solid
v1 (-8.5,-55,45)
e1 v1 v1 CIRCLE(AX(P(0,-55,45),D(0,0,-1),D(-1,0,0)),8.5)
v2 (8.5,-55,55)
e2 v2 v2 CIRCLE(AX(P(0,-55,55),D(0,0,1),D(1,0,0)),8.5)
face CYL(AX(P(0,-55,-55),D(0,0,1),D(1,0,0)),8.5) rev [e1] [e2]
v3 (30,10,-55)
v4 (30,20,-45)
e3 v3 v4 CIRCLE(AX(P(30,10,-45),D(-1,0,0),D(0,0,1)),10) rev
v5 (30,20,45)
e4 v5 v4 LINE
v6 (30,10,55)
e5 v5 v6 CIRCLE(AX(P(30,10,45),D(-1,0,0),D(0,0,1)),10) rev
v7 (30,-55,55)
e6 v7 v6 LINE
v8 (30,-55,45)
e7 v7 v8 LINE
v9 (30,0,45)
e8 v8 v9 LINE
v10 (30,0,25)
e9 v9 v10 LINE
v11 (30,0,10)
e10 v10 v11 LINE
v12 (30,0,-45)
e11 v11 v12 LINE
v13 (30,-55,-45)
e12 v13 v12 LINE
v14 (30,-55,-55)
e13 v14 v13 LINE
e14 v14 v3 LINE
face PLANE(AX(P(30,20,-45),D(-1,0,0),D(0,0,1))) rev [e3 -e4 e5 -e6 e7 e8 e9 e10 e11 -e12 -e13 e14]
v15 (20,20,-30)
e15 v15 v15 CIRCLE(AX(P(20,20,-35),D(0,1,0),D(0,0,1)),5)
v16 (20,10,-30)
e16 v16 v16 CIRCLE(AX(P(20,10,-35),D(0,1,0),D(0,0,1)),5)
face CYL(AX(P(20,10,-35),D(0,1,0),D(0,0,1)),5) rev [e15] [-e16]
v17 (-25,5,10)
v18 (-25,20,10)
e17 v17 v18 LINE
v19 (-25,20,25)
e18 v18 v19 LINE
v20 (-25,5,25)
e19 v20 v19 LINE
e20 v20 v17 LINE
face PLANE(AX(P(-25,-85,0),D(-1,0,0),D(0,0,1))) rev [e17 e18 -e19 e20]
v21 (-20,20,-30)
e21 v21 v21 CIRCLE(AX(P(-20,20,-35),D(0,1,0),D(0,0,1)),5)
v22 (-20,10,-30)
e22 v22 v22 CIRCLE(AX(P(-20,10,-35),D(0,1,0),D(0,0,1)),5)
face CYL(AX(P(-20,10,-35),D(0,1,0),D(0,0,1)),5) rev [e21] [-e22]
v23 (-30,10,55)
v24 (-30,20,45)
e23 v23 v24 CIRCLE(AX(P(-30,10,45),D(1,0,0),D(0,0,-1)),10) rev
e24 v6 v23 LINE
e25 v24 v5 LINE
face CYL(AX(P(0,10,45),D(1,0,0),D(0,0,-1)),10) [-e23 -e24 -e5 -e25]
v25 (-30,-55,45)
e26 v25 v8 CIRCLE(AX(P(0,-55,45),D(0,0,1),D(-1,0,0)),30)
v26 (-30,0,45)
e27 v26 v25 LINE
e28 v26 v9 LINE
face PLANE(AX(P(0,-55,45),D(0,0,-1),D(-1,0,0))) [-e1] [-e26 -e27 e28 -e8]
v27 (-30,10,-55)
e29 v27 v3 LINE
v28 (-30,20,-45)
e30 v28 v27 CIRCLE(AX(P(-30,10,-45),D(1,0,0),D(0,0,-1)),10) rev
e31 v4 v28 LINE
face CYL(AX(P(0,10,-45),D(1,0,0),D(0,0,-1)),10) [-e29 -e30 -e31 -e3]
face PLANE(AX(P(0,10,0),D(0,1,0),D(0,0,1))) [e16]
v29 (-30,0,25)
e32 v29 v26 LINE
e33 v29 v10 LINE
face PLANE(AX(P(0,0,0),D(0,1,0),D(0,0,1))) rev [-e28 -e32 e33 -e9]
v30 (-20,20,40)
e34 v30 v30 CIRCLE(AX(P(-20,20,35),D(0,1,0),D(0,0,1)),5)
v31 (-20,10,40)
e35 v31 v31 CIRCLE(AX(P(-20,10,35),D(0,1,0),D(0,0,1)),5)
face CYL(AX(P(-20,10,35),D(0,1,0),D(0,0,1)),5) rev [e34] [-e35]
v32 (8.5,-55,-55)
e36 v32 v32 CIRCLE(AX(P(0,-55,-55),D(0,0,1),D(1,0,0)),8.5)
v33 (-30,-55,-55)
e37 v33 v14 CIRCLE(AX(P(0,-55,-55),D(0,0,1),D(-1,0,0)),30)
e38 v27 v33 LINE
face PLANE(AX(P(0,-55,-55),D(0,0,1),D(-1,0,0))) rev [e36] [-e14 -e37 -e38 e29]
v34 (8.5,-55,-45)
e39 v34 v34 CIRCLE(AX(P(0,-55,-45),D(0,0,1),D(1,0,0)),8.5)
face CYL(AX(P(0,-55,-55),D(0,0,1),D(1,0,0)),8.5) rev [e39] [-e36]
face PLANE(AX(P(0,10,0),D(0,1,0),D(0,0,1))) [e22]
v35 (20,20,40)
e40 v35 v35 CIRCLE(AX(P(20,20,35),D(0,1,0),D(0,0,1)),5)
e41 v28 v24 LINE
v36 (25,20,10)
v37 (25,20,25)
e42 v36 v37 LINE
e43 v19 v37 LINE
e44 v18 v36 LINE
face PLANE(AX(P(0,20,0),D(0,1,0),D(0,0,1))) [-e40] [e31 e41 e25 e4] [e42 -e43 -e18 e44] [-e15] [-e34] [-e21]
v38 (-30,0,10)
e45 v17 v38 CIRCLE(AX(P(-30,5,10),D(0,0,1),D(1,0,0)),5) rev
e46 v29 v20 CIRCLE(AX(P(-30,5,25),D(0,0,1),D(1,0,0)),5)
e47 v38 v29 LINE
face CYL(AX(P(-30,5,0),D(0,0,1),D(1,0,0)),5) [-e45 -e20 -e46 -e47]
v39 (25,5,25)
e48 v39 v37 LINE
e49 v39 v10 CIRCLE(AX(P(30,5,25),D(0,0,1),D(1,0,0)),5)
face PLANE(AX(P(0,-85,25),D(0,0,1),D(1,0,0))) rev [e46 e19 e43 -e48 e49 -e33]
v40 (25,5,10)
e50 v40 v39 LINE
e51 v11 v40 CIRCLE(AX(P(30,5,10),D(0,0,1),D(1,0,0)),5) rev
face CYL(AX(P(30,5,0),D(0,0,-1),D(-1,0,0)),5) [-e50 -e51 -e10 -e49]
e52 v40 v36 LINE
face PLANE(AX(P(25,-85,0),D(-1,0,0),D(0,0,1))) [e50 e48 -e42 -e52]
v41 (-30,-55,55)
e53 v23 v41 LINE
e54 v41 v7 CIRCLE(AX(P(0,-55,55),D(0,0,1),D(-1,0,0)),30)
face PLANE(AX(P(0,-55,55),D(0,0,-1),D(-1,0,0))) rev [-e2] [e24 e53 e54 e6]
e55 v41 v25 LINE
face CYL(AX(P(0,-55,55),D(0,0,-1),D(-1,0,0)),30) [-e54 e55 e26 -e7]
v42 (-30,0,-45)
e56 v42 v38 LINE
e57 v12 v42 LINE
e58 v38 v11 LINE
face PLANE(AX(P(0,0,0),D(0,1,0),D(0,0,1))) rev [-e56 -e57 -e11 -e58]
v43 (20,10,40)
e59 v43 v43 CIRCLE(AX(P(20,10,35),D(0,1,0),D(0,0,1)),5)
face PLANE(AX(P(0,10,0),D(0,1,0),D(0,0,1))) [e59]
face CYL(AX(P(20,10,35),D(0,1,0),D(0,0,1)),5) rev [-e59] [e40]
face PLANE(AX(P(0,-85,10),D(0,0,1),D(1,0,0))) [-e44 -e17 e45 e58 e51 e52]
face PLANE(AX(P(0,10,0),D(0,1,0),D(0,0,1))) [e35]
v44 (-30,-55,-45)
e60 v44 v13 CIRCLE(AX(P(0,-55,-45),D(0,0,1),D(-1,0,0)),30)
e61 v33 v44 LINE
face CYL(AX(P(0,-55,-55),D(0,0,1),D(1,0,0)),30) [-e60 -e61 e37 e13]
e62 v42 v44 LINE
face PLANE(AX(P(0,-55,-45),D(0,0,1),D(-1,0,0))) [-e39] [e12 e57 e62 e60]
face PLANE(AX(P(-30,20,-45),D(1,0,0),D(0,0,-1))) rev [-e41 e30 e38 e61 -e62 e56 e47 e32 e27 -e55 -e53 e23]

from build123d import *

# Parameters (mm, degrees)
SKETCH1_W           = 60
SKETCH1_H           = 90
BOSS_EXTRUDE1_DEPTH = 20
CUT_EXTRUDE1_DEPTH  = 10
BOSS_EXTRUDE2_DEPTH = 10
SKETCH5_R           = 8.5
CUT_EXTRUDE2_DEPTH  = 143.214626533
FILLET1_R           = 10
SKETCH6_W           = 50
SKETCH6_H           = 15
CUT_EXTRUDE3_DEPTH  = 123.270192606
FILLET2_R           = 5


with BuildPart() as part:
    # Sketch1 → Boss-Extrude1 (new body)
    with BuildSketch(Plane(origin=(0, 0, 0), x_dir=(1, 0, 0), z_dir=(0, 1, 0))):
        Rectangle(SKETCH1_W, SKETCH1_H)
    extrude(amount=BOSS_EXTRUDE1_DEPTH)

    # Sketch3 → Cut-Extrude1 (cut)
    with BuildSketch(Plane(origin=(0, 20, 0), x_dir=(1, 0, 0), z_dir=(0, 1, 0))):
        with BuildLine():
            ThreePointArc((-20, 30), (-16.464466094, 31.464466094), (-15, 35))
            Line((-15, 35), (-20, 35))
            Line((-20, 35), (-20, 30))
        make_face()
        with BuildLine():
            Line((-20, 35), (-15, 35))
            ThreePointArc((-15, 35), (-23.535533906, 38.535533906), (-20, 30))
            Line((-20, 30), (-20, 35))
        make_face()
        with BuildLine():
            ThreePointArc((-20, 30), (-16.464466094, 31.464466094), (-15, 35))
            Line((-15, 35), (-20, 35))
            Line((-20, 35), (-20, 30))
        make_face()
        with BuildLine():
            Line((-20, 35), (-15, 35))
            ThreePointArc((-15, 35), (-23.535533906, 38.535533906), (-20, 30))
            Line((-20, 30), (-20, 35))
        make_face()
        with BuildLine():
            ThreePointArc((-20, -30), (-23.535533906, -38.535533906), (-15, -35))
            Line((-15, -35), (-20, -35))
            Line((-20, -35), (-20, -30))
        make_face()
        with BuildLine():
            Line((-20, -35), (-15, -35))
            ThreePointArc((-15, -35), (-16.464466094, -31.464466094), (-20, -30))
            Line((-20, -30), (-20, -35))
        make_face()
        with BuildLine():
            ThreePointArc((-20, -30), (-23.535533906, -38.535533906), (-15, -35))
            Line((-15, -35), (-20, -35))
            Line((-20, -35), (-20, -30))
        make_face()
        with BuildLine():
            Line((-20, -35), (-15, -35))
            ThreePointArc((-15, -35), (-16.464466094, -31.464466094), (-20, -30))
            Line((-20, -30), (-20, -35))
        make_face()
        with BuildLine():
            Line((15, -35), (20, -35))
            Line((20, -35), (20, -30))
            ThreePointArc((20, -30), (16.464466094, -31.464466094), (15, -35))
        make_face()
        with BuildLine():
            Line((20, -30), (20, -35))
            Line((20, -35), (15, -35))
            ThreePointArc((15, -35), (20, -40), (25, -35))
            ThreePointArc((25, -35), (23.535533906, -31.464466094), (20, -30))
        make_face()
        with BuildLine():
            Line((15, -35), (20, -35))
            Line((20, -35), (20, -30))
            ThreePointArc((20, -30), (16.464466094, -31.464466094), (15, -35))
        make_face()
        with BuildLine():
            Line((20, -30), (20, -35))
            Line((20, -35), (15, -35))
            ThreePointArc((15, -35), (20, -40), (25, -35))
            ThreePointArc((25, -35), (23.535533906, -31.464466094), (20, -30))
        make_face()
        with BuildLine():
            ThreePointArc((15, 35), (16.464466094, 31.464466094), (20, 30))
            Line((20, 30), (20, 35))
            Line((20, 35), (15, 35))
        make_face()
        with BuildLine():
            Line((20, 35), (20, 30))
            ThreePointArc((20, 30), (23.535533906, 31.464466094), (25, 35))
            ThreePointArc((25, 35), (20, 40), (15, 35))
            Line((15, 35), (20, 35))
        make_face()
        with BuildLine():
            ThreePointArc((15, 35), (16.464466094, 31.464466094), (20, 30))
            Line((20, 30), (20, 35))
            Line((20, 35), (15, 35))
        make_face()
        with BuildLine():
            Line((20, 35), (20, 30))
            ThreePointArc((20, 30), (23.535533906, 31.464466094), (25, 35))
            ThreePointArc((25, 35), (20, 40), (15, 35))
            Line((15, 35), (20, 35))
        make_face()
    extrude(amount=-CUT_EXTRUDE1_DEPTH, mode=Mode.SUBTRACT)

    # Sketch4 → Boss-Extrude2 (add)
    with BuildSketch(Plane.XY.offset(45)):
        with BuildLine():
            Line((-30, 0), (-30, -55))
            ThreePointArc((-30, -55), (0, -85), (30, -55))
            Line((30, -55), (30, 0))
            Line((30, 0), (30, 20))
            Line((30, 20), (-30, 20))
            Line((-30, 20), (-30, 0))
        make_face()
    boss_extrude2 = extrude(amount=BOSS_EXTRUDE2_DEPTH)

    # Mirror1: Boss-Extrude2 across plane
    add(boss_extrude2.mirror(Plane.XY))

    # Sketch5 → Cut-Extrude2 (cut, through all)
    with BuildSketch(Plane.XY.offset(55)):
        with Locations((0, -55)):
            Circle(SKETCH5_R)
    extrude(amount=-CUT_EXTRUDE2_DEPTH, mode=Mode.SUBTRACT)

    # Fillet1
    fillet1_edges = [part.edges().sort_by_distance(p)[0] for p in [
        (0, 20, 55),
        (0, 20, -55),
    ]]
    fillet(fillet1_edges, radius=FILLET1_R)

    # Sketch6 → Cut-Extrude3 (cut, through all)
    with BuildSketch(Plane(origin=(0, 20, 0), x_dir=(1, 0, 0), z_dir=(0, 1, 0))):
        with Locations((0, -17.5)):
            Rectangle(SKETCH6_W, SKETCH6_H)
    extrude(amount=-CUT_EXTRUDE3_DEPTH, mode=Mode.SUBTRACT)

    # Fillet2
    fillet2_edges = [part.edges().sort_by_distance(p)[0] for p in [
        (-25, 0, 17.5),
        (25, 0, 17.5),
    ]]
    fillet(fillet2_edges, radius=FILLET2_R - 0.0001)  # a hair under: the kernel refuses the full size


solid = part.part
